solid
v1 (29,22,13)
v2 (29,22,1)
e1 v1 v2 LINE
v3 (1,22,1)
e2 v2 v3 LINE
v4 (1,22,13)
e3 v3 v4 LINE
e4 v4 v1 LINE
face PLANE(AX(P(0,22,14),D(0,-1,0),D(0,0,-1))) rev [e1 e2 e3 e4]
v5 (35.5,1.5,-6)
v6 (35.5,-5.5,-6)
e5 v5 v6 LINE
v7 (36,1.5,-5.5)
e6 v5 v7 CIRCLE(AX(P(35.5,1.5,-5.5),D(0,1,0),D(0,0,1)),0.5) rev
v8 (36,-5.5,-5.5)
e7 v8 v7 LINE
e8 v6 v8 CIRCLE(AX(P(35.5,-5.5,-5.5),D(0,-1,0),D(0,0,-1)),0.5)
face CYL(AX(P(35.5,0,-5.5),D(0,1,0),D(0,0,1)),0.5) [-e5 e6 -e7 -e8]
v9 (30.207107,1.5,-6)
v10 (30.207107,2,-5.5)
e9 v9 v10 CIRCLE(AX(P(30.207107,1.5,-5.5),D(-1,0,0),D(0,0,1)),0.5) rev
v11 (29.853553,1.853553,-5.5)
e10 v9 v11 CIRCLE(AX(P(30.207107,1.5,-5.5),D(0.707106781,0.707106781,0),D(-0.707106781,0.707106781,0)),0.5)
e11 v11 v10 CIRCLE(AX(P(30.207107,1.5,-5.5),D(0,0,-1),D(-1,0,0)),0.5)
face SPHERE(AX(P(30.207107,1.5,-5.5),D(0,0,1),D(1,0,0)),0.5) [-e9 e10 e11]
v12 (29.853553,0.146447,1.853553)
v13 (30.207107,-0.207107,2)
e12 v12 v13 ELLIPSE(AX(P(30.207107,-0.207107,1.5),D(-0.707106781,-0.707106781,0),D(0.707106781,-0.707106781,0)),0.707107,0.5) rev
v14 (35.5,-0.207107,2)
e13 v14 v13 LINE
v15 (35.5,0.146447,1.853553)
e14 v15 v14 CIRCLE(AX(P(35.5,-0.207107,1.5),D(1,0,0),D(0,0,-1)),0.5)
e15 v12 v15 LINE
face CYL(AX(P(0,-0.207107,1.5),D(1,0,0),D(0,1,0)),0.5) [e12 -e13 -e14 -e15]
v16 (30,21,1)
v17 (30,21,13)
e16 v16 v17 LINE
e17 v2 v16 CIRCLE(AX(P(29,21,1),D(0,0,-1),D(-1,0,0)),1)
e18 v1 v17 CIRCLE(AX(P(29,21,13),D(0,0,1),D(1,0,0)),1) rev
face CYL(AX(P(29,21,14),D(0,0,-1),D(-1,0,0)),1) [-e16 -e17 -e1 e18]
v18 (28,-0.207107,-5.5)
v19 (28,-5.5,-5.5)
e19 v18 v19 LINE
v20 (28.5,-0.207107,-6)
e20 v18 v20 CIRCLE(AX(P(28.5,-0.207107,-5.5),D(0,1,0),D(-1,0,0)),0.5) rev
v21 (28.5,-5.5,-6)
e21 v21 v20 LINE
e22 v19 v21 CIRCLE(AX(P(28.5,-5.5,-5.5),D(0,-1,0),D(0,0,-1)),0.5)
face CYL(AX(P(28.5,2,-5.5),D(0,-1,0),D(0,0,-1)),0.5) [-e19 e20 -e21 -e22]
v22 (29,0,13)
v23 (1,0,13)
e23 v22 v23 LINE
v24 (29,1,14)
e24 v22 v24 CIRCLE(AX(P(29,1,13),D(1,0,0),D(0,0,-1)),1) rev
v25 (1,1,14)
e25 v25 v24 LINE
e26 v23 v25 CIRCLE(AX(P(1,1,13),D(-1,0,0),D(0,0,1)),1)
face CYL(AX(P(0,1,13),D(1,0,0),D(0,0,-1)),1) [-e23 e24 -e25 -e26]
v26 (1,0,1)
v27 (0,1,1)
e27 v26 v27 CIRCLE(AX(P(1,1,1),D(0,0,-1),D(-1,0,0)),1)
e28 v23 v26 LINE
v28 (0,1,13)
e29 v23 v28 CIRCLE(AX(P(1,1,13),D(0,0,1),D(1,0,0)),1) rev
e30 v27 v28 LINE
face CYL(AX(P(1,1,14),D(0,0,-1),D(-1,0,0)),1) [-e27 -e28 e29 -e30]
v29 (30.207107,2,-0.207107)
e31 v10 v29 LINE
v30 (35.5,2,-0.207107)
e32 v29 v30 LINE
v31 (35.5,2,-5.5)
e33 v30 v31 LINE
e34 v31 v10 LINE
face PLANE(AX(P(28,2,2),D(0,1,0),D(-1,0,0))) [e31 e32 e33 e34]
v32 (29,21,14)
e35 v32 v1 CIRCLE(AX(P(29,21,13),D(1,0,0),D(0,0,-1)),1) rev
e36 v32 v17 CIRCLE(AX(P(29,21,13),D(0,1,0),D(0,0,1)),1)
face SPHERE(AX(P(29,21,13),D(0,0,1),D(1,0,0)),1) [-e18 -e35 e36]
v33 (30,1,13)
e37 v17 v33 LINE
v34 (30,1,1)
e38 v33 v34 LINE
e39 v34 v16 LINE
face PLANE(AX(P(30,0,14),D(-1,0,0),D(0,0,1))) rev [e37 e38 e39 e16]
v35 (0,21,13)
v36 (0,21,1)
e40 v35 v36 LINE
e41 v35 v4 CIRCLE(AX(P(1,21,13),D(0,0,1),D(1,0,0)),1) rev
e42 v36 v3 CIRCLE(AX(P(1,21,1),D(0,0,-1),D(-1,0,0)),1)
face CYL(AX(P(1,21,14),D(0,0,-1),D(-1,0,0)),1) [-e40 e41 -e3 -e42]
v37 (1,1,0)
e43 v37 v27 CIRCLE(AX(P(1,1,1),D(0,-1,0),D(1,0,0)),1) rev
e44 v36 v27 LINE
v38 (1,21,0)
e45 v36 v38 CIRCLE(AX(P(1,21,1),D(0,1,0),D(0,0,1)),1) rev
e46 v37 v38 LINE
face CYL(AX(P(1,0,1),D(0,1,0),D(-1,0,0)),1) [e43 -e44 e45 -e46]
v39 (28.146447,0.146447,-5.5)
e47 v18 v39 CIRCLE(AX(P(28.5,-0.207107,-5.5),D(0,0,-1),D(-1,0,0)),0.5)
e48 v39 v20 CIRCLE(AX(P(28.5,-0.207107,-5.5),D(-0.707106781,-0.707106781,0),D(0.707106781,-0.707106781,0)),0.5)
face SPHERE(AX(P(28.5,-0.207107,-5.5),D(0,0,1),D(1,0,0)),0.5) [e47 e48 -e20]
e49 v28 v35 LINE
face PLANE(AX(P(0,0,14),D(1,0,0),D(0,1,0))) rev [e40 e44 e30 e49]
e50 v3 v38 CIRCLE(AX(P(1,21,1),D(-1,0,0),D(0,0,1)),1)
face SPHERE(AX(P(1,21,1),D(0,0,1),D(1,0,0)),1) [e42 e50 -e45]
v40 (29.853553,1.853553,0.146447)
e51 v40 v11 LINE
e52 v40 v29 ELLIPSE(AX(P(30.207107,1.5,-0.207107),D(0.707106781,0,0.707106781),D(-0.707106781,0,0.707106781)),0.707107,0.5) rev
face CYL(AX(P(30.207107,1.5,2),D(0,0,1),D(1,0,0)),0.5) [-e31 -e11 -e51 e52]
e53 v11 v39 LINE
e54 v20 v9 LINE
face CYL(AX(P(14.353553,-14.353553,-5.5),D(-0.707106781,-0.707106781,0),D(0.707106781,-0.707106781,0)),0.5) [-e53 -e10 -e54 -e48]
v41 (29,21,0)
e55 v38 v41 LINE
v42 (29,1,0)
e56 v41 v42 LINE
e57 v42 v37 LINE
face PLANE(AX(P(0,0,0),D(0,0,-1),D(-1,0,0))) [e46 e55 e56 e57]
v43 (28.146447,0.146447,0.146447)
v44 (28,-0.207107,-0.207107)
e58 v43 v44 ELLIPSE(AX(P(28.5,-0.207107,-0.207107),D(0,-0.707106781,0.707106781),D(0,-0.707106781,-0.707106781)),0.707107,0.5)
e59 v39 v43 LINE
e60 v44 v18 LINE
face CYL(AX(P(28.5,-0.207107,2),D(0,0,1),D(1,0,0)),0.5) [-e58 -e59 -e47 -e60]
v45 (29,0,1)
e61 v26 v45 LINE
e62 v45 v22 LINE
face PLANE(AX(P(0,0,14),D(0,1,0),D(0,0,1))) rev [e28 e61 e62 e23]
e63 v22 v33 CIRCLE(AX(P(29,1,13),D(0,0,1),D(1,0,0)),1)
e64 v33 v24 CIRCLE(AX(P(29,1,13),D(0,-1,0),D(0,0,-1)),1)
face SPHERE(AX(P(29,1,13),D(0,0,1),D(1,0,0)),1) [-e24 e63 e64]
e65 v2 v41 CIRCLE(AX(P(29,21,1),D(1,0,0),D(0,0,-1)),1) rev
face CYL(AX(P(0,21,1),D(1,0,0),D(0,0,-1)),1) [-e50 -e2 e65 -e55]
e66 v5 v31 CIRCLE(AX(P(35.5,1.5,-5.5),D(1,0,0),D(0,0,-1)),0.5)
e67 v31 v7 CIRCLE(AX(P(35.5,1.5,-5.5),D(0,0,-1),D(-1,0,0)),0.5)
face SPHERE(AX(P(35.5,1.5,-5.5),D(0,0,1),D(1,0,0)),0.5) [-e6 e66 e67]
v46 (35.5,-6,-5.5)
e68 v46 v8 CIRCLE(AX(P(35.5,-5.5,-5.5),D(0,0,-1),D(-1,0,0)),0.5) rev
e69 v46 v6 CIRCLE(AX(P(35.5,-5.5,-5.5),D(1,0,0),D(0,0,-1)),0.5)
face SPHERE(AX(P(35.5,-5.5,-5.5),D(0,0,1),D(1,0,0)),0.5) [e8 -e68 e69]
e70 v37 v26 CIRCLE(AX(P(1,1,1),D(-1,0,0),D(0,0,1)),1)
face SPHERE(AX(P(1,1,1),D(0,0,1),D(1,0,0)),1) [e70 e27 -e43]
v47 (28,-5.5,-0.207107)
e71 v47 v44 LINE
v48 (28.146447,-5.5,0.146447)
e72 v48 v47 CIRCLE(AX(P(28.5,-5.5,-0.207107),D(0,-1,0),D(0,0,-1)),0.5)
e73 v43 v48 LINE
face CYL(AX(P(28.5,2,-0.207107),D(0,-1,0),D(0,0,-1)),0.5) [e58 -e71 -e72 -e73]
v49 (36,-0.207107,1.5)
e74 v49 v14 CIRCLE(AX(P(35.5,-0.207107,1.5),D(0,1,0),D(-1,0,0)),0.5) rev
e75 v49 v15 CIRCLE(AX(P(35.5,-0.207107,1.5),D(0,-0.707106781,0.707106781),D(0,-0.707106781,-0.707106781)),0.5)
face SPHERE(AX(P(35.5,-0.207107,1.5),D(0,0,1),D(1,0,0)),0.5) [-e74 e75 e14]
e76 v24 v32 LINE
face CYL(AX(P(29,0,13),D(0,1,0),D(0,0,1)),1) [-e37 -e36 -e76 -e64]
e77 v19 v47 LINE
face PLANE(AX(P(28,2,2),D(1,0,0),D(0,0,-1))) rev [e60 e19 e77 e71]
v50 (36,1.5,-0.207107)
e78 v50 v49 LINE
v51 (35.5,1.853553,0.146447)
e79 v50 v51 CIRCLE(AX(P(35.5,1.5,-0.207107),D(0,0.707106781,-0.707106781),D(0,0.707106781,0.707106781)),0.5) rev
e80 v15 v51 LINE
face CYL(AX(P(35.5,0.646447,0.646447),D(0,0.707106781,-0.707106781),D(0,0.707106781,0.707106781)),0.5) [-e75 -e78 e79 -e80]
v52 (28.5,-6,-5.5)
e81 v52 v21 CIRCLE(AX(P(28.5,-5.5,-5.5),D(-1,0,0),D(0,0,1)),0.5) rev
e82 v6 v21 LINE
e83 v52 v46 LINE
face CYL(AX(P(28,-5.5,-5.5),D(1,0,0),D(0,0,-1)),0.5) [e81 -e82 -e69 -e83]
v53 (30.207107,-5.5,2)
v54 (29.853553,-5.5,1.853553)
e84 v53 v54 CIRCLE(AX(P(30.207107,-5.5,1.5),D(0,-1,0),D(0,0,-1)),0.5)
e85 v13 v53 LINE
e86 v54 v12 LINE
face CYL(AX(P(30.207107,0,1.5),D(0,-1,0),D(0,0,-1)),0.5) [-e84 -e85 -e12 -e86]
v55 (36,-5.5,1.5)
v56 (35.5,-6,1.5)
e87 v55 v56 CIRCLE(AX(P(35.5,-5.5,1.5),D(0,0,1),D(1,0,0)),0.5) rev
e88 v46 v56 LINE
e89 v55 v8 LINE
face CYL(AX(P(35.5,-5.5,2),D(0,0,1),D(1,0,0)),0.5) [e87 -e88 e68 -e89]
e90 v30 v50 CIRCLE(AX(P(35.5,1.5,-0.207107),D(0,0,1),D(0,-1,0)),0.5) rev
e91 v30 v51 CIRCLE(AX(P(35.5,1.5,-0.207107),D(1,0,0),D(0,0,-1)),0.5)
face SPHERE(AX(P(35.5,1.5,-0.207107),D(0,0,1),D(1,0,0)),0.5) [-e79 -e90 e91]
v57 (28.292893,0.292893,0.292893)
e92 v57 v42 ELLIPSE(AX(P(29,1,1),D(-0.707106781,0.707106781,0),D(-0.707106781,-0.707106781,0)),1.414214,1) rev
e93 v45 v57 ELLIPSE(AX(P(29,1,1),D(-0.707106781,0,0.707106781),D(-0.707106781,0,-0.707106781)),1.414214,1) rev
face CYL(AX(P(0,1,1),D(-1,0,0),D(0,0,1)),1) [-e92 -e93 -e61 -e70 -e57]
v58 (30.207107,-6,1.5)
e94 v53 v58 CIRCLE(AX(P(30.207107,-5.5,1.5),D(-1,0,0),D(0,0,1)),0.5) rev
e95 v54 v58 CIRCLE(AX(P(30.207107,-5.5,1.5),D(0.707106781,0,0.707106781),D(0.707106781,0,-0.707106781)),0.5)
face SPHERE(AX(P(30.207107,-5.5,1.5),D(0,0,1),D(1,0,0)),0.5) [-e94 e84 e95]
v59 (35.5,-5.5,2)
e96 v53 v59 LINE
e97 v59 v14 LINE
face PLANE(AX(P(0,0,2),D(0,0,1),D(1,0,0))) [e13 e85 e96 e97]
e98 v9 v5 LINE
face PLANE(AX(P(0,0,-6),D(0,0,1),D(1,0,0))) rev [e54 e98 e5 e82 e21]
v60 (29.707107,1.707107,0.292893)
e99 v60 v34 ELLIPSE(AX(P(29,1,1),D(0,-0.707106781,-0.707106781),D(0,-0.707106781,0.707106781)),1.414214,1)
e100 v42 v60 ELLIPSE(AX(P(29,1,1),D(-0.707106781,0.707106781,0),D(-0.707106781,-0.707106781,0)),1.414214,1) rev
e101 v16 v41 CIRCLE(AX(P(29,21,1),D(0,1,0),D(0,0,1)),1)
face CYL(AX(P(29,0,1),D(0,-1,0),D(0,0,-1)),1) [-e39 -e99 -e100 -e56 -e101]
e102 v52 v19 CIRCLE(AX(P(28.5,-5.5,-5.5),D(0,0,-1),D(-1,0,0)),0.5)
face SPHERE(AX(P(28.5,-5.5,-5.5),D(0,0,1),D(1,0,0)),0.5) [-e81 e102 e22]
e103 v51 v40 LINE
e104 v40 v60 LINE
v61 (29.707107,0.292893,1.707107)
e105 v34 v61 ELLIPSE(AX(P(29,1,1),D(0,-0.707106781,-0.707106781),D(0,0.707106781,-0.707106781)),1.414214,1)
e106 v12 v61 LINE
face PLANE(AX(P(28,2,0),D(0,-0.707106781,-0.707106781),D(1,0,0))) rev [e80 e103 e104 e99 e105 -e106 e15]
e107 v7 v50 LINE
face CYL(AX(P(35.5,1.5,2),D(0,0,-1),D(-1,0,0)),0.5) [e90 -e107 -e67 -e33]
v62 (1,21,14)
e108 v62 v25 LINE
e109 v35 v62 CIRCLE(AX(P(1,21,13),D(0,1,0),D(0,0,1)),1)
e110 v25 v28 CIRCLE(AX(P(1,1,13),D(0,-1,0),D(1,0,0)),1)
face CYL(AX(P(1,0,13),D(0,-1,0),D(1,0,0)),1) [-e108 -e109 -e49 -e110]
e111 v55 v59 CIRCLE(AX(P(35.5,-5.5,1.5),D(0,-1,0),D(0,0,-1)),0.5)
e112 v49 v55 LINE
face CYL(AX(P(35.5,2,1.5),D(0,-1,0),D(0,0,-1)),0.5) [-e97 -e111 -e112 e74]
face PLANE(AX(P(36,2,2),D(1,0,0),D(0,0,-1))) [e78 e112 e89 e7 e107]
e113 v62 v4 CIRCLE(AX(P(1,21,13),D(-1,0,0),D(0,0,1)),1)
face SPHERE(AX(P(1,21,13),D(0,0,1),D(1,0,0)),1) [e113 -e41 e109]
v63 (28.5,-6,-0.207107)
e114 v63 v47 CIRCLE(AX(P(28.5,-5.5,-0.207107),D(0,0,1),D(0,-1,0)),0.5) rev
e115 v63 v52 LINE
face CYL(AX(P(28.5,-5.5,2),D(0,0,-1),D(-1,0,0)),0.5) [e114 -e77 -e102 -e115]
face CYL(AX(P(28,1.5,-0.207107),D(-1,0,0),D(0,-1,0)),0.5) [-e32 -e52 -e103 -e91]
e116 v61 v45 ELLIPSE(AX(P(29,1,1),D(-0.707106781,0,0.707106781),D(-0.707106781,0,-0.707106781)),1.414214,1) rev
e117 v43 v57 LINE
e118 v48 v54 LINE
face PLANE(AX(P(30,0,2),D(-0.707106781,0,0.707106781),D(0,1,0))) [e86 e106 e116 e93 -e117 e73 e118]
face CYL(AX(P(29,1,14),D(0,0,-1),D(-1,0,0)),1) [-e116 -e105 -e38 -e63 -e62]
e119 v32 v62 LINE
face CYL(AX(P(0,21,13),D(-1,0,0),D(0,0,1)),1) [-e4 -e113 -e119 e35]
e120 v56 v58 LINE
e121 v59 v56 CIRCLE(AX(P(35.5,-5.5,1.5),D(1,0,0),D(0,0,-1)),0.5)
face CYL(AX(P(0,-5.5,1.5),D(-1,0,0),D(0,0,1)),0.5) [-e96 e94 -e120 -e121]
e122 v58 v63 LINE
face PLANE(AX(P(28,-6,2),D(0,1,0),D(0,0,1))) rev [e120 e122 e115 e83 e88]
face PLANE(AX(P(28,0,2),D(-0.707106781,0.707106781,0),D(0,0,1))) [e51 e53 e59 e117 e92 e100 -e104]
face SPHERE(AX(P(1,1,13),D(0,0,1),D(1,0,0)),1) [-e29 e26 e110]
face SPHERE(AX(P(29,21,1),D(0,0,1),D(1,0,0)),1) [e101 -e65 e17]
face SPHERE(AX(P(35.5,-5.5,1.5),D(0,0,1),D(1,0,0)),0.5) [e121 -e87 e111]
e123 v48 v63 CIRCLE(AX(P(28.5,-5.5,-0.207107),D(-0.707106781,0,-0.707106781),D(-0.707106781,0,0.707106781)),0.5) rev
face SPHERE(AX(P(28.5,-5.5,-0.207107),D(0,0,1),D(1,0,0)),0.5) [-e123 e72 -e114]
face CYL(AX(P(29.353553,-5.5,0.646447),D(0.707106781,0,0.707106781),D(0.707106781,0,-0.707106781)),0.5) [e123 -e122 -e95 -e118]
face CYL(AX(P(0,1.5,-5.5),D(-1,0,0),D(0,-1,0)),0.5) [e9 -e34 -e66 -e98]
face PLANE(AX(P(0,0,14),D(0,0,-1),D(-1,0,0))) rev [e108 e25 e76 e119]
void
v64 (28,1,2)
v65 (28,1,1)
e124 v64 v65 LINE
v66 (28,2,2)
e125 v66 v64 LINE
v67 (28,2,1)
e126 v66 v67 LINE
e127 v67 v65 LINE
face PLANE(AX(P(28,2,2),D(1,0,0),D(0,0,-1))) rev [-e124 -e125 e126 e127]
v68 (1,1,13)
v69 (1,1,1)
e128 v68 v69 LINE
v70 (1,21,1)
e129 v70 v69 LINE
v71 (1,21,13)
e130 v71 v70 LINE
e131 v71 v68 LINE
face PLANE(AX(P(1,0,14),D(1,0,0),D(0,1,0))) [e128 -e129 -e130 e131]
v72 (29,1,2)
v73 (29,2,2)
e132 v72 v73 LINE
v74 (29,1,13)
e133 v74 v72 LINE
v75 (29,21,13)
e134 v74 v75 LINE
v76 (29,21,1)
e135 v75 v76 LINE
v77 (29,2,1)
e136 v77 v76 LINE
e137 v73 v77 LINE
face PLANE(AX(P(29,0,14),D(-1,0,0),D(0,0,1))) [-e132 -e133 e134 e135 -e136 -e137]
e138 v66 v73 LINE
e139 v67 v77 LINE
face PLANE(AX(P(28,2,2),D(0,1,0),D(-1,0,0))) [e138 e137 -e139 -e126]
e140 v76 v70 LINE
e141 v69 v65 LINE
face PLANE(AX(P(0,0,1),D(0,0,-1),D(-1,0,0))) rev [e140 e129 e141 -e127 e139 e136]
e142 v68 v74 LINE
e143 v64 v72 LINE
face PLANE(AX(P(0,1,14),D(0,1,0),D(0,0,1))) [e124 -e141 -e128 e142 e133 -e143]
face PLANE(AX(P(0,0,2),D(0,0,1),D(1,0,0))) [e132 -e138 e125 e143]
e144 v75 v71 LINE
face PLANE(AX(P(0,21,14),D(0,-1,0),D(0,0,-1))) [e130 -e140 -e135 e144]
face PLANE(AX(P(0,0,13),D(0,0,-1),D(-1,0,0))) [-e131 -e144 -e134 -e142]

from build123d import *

# Parameters (mm, degrees)
SKETCH1_W                = 30
SKETCH1_H                = 22
BOSS_EXTRUDE1_DEPTH      = 14
SHELL1_T                 = 1
BOSS_EXTRUDE3_DEPTH      = 6
BOSS_EXTRUDE3_DEPTH_BACK = 2
SKETCH2_W                = 8
SKETCH2_H                = 8
CHAMFER2_SIZE            = 2
FILLET1_R                = 1
FILLET2_R                = 0.5


with BuildPart() as part:
    # Sketch1 → Boss-Extrude1 (new body)
    with BuildSketch(Plane.XY):
        with Locations((15, 11)):
            Rectangle(SKETCH1_W, SKETCH1_H)
    extrude(amount=BOSS_EXTRUDE1_DEPTH)

    # Shell1 (no face opened: a closed hollow body)
    add(offset(amount=-SHELL1_T, mode=Mode.PRIVATE), mode=Mode.SUBTRACT)

    # Sketch2 → Boss-Extrude3 (add, two sides: drawn at the far end of the back side and taken through both)
    with BuildSketch(Plane(origin=(0, 0, 0), x_dir=(-1, 0, 0), z_dir=(0, 0, -1)).offset(-BOSS_EXTRUDE3_DEPTH_BACK)):
        with Locations((-32, -2)):
            Rectangle(SKETCH2_W, SKETCH2_H)
    extrude(amount=BOSS_EXTRUDE3_DEPTH + BOSS_EXTRUDE3_DEPTH_BACK)

    # Chamfer2
    chamfer2_edges = [part.edges().sort_by_distance(p)[0] for p in [
        (28, -3, 2),
        (28, 2, -3),
        (33, 2, 2),
    ]]
    chamfer(chamfer2_edges, length=CHAMFER2_SIZE)

    # Fillet1
    # the kernel refuses this fillet: 1 mm, written as the material it takes off along each edge
    with BuildSketch(Plane(origin=(1, 21, 1), x_dir=(0, 1, 0), z_dir=(0, 0, -1))) as fillet1_piece_1_section:
        Polygon((0, 0), (FILLET1_R, 0), (FILLET1_R, -FILLET1_R), (0, -FILLET1_R), align=None)
    fillet1_piece_1 = extrude(amount=FILLET1_R, mode=Mode.PRIVATE)
    fillet1_piece_1 = fillet1_piece_1 - Plane(origin=(1, 21, 1), x_dir=(0.7071067811865475, -0.7071067811865477, 0), z_dir=(0, 0, -1)) * Sphere(FILLET1_R, mode=Mode.PRIVATE)
    add(fillet1_piece_1, mode=Mode.SUBTRACT)
    with BuildSketch(Plane(origin=(1, 1, 1), x_dir=(0, 0, -1), z_dir=(0, -1, 0))) as fillet1_piece_2_section:
        Polygon((0, 0), (FILLET1_R, 0), (FILLET1_R, -FILLET1_R), (0, -FILLET1_R), align=None)
    fillet1_piece_2 = extrude(amount=FILLET1_R, mode=Mode.PRIVATE)
    fillet1_piece_2 = fillet1_piece_2 - Plane(origin=(1, 1, 1), x_dir=(0.7071067811865475, 0, 0.7071067811865475), z_dir=(0, -1, 0)) * Sphere(FILLET1_R, mode=Mode.PRIVATE)
    add(fillet1_piece_2, mode=Mode.SUBTRACT)
    with BuildSketch(Plane(origin=(29, 21, 1), x_dir=(0, 0, -1), z_dir=(0, 1, 0))) as fillet1_piece_3_section:
        Polygon((0, 0), (FILLET1_R, 0), (FILLET1_R, -FILLET1_R), (0, -FILLET1_R), align=None)
    fillet1_piece_3 = extrude(amount=FILLET1_R, mode=Mode.PRIVATE)
    fillet1_piece_3 = fillet1_piece_3 - Plane(origin=(29, 21, 1), x_dir=(-0.7071067811865475, 0, 0.7071067811865475), z_dir=(0, 1, 0)) * Sphere(FILLET1_R, mode=Mode.PRIVATE)
    add(fillet1_piece_3, mode=Mode.SUBTRACT)
    with BuildSketch(Plane(origin=(1, 1, 13), x_dir=(-1, 0, 0), z_dir=(0, -1, 0))) as fillet1_piece_4_section:
        Polygon((0, 0), (FILLET1_R, 0), (FILLET1_R, -FILLET1_R), (0, -FILLET1_R), align=None)
    fillet1_piece_4 = extrude(amount=FILLET1_R, mode=Mode.PRIVATE)
    fillet1_piece_4 = fillet1_piece_4 - Plane(origin=(1, 1, 13), x_dir=(0.7071067811865475, 0, -0.7071067811865475), z_dir=(0, -1, 0)) * Sphere(FILLET1_R, mode=Mode.PRIVATE)
    add(fillet1_piece_4, mode=Mode.SUBTRACT)
    with BuildSketch(Plane(origin=(29, 1, 13), x_dir=(1, 0, 0), z_dir=(0, -1, 0))) as fillet1_piece_5_section:
        Polygon((0, 0), (FILLET1_R, 0), (FILLET1_R, FILLET1_R), (0, FILLET1_R), align=None)
    fillet1_piece_5 = extrude(amount=FILLET1_R, mode=Mode.PRIVATE)
    fillet1_piece_5 = fillet1_piece_5 - Plane(origin=(29, 1, 13), x_dir=(-0.7071067811865475, 0, -0.7071067811865475), z_dir=(0, -1, 0)) * Sphere(FILLET1_R, mode=Mode.PRIVATE)
    add(fillet1_piece_5, mode=Mode.SUBTRACT)
    with BuildSketch(Plane(origin=(29, 21, 13), x_dir=(1, 0, 0), z_dir=(0, 1, 0))) as fillet1_piece_6_section:
        Polygon((0, 0), (FILLET1_R, 0), (FILLET1_R, -FILLET1_R), (0, -FILLET1_R), align=None)
    fillet1_piece_6 = extrude(amount=FILLET1_R, mode=Mode.PRIVATE)
    fillet1_piece_6 = fillet1_piece_6 - Plane(origin=(29, 21, 13), x_dir=(-0.7071067811865475, 0, -0.7071067811865475), z_dir=(0, 1, 0)) * Sphere(FILLET1_R, mode=Mode.PRIVATE)
    add(fillet1_piece_6, mode=Mode.SUBTRACT)
    with BuildSketch(Plane(origin=(1, 21, 13), x_dir=(-1, 0, 0), z_dir=(0, 1, 0))) as fillet1_piece_7_section:
        Polygon((0, 0), (FILLET1_R, 0), (FILLET1_R, FILLET1_R), (0, FILLET1_R), align=None)
    fillet1_piece_7 = extrude(amount=FILLET1_R, mode=Mode.PRIVATE)
    fillet1_piece_7 = fillet1_piece_7 - Plane(origin=(1, 21, 13), x_dir=(0.7071067811865475, 0, -0.7071067811865475), z_dir=(0, 1, 0)) * Sphere(FILLET1_R, mode=Mode.PRIVATE)
    add(fillet1_piece_7, mode=Mode.SUBTRACT)
    with BuildSketch(Plane(origin=(0, 21, 0), x_dir=(1, 0, 0), z_dir=(0, -1, 0)), Plane(origin=(30, 1, 14), x_dir=(0, 0, -1), z_dir=(0, 1, 0)), Plane(origin=(0, 21, 14), x_dir=(0, 0, -1), z_dir=(0, -1, 0))) as fillet1_piece_8:
        with BuildLine():
            CenterArc((FILLET1_R, FILLET1_R), FILLET1_R, 180, 90)
            Line((0, FILLET1_R), (0, 0))
            Line((0, 0), (FILLET1_R, 0))
        make_face()
    extrude(amount=20, mode=Mode.SUBTRACT)
    with BuildSketch(Plane(origin=(1, 0, 0), x_dir=(0, 0, 1), z_dir=(1, 0, 0))) as fillet1_piece_9_section:
        with BuildLine():
            CenterArc((FILLET1_R, -FILLET1_R), FILLET1_R, 90, 90)
            Line((0, -FILLET1_R), (0, 0))
            Line((0, 0), (FILLET1_R, 0))
        make_face()
    fillet1_piece_9 = extrude(amount=29.5, mode=Mode.PRIVATE)
    fillet1_piece_9 = split(fillet1_piece_9, bisect_by=Plane(origin=(21.381816869, 0.226411675, -6.618183131), z_dir=(-0.7071067811865476, 0, 0.7071067811865476)), keep=Keep.TOP, mode=Mode.PRIVATE)
    fillet1_piece_9 = split(fillet1_piece_9, bisect_by=Plane(origin=(21.381816869, -6.618183131, 0.226411675), z_dir=(-0.7071067811865476, 0.7071067811865476, 0)), keep=Keep.TOP, mode=Mode.PRIVATE)
    add(fillet1_piece_9, mode=Mode.SUBTRACT)
    with BuildSketch(Plane(origin=(1, 0, 0), x_dir=(0, 0, 1), z_dir=(1, 0, 0))) as fillet1_piece_10_section:
        with BuildLine():
            CenterArc((FILLET1_R, -FILLET1_R), FILLET1_R, 90, 90)
            Line((0, -FILLET1_R), (0, 0))
            Line((0, 0), (FILLET1_R, 0))
        make_face()
    fillet1_piece_10 = extrude(amount=29.5, mode=Mode.PRIVATE)
    fillet1_piece_10 = split(fillet1_piece_10, bisect_by=Plane(origin=(28.16446835, 0.528927527, 0.16446835), z_dir=(0.7071067811865476, 0, -0.7071067811865476)), keep=Keep.TOP, mode=Mode.PRIVATE)
    fillet1_piece_10 = split(fillet1_piece_10, bisect_by=Plane(origin=(28.407441135, 0.407441135, 0.042981958), z_dir=(-0.7071067811865476, 0.7071067811865476, 0)), keep=Keep.TOP, mode=Mode.PRIVATE)
    add(fillet1_piece_10, mode=Mode.SUBTRACT)
    with BuildSketch(Plane(origin=(1, 0, 0), x_dir=(0, 0, 1), z_dir=(1, 0, 0))) as fillet1_piece_11_section:
        with BuildLine():
            CenterArc((FILLET1_R, -FILLET1_R), FILLET1_R, 90, 90)
            Line((0, -FILLET1_R), (0, 0))
            Line((0, 0), (FILLET1_R, 0))
        make_face()
    fillet1_piece_11 = extrude(amount=29.5, mode=Mode.PRIVATE)
    fillet1_piece_11 = split(fillet1_piece_11, bisect_by=Plane(origin=(28.407441135, 0.042981958, 0.407441135), z_dir=(-0.7071067811865476, 0, 0.7071067811865476)), keep=Keep.TOP, mode=Mode.PRIVATE)
    fillet1_piece_11 = split(fillet1_piece_11, bisect_by=Plane(origin=(28.16446835, 0.16446835, 0.528927527), z_dir=(0.7071067811865476, -0.7071067811865476, 0)), keep=Keep.TOP, mode=Mode.PRIVATE)
    add(fillet1_piece_11, mode=Mode.SUBTRACT)
    with BuildSketch(Plane(origin=(30, -0.5, 0), x_dir=(-1, 0, 0), z_dir=(0, 1, 0))) as fillet1_piece_12_section:
        with BuildLine():
            CenterArc((FILLET1_R, FILLET1_R), FILLET1_R, 180, 90)
            Line((0, FILLET1_R), (0, 0))
            Line((0, 0), (FILLET1_R, 0))
        make_face()
    fillet1_piece_12 = extrude(amount=21.5, mode=Mode.PRIVATE)
    fillet1_piece_12 = split(fillet1_piece_12, bisect_by=Plane(origin=(29.83553165, 1.83553165, 0.528927527), z_dir=(0.7071067811865476, -0.7071067811865476, 0)), keep=Keep.TOP, mode=Mode.PRIVATE)
    fillet1_piece_12 = split(fillet1_piece_12, bisect_by=Plane(origin=(29.957018042, 1.592558865, 0.407441135), z_dir=(0, 0.7071067811865476, 0.7071067811865476)), keep=Keep.TOP, mode=Mode.PRIVATE)
    add(fillet1_piece_12, mode=Mode.SUBTRACT)
    with BuildSketch(Plane(origin=(30, -0.5, 0), x_dir=(-1, 0, 0), z_dir=(0, 1, 0))) as fillet1_piece_13_section:
        with BuildLine():
            CenterArc((FILLET1_R, FILLET1_R), FILLET1_R, 180, 90)
            Line((0, FILLET1_R), (0, 0))
            Line((0, 0), (FILLET1_R, 0))
        make_face()
    fillet1_piece_13 = extrude(amount=21.5, mode=Mode.PRIVATE)
    fillet1_piece_13 = split(fillet1_piece_13, bisect_by=Plane(origin=(29.592558865, 1.592558865, 0.042981958), z_dir=(-0.7071067811865476, 0.7071067811865476, 0)), keep=Keep.TOP, mode=Mode.PRIVATE)
    fillet1_piece_13 = split(fillet1_piece_13, bisect_by=Plane(origin=(29.471072473, 1.83553165, 0.16446835), z_dir=(0, -0.7071067811865476, -0.7071067811865476)), keep=Keep.TOP, mode=Mode.PRIVATE)
    add(fillet1_piece_13, mode=Mode.SUBTRACT)
    with BuildSketch(Plane(origin=(30, -0.5, 0), x_dir=(-1, 0, 0), z_dir=(0, 1, 0))) as fillet1_piece_14_section:
        with BuildLine():
            CenterArc((FILLET1_R, FILLET1_R), FILLET1_R, 180, 90)
            Line((0, FILLET1_R), (0, 0))
            Line((0, 0), (FILLET1_R, 0))
        make_face()
    fillet1_piece_14 = extrude(amount=21.5, mode=Mode.PRIVATE)
    fillet1_piece_14 = split(fillet1_piece_14, bisect_by=Plane(origin=(34.618159496, 6.618159496, 0.226418621), z_dir=(-0.7071067811865476, 0.7071067811865476, 0)), keep=Keep.TOP, mode=Mode.PRIVATE)
    fillet1_piece_14 = split(fillet1_piece_14, bisect_by=Plane(origin=(29.773581379, 6.618159496, -4.618159496), z_dir=(0, 0.7071067811865476, 0.7071067811865476)), keep=Keep.TOP, mode=Mode.PRIVATE)
    add(fillet1_piece_14, mode=Mode.SUBTRACT)
    with BuildSketch(Plane(origin=(29, 22, 0), x_dir=(0, -1, 0), z_dir=(-1, 0, 0)), Plane(origin=(1, 0, 14), x_dir=(0, 0, -1), z_dir=(1, 0, 0))) as fillet1_piece_15:
        with BuildLine():
            CenterArc((FILLET1_R, FILLET1_R), FILLET1_R, 180, 90)
            Line((0, FILLET1_R), (0, 0))
            Line((0, 0), (FILLET1_R, 0))
        make_face()
    extrude(amount=28, mode=Mode.SUBTRACT)
    with BuildSketch(Plane(origin=(29, 22, 14), x_dir=(0, -1, 0), z_dir=(-1, 0, 0))) as fillet1_piece_16:
        with BuildLine():
            CenterArc((FILLET1_R, -FILLET1_R), FILLET1_R, 90, 90)
            Line((0, -FILLET1_R), (0, 0))
            Line((0, 0), (FILLET1_R, 0))
        make_face()
    extrude(amount=28, mode=Mode.SUBTRACT)
    with BuildSketch(Plane(origin=(0, 22, 1), x_dir=(0, -1, 0), z_dir=(0, 0, 1)), Plane(origin=(0, 0, 1), x_dir=(1, 0, 0), z_dir=(0, 0, 1))) as fillet1_piece_17:
        with BuildLine():
            CenterArc((FILLET1_R, FILLET1_R), FILLET1_R, 180, 90)
            Line((0, FILLET1_R), (0, 0))
            Line((0, 0), (FILLET1_R, 0))
        make_face()
    extrude(amount=12, mode=Mode.SUBTRACT)
    with BuildSketch(Plane(origin=(30, 22, 1), x_dir=(0, -1, 0), z_dir=(0, 0, 1))) as fillet1_piece_18:
        with BuildLine():
            CenterArc((FILLET1_R, -FILLET1_R), FILLET1_R, 90, 90)
            Line((0, -FILLET1_R), (0, 0))
            Line((0, 0), (FILLET1_R, 0))
        make_face()
    extrude(amount=12, mode=Mode.SUBTRACT)
    with BuildSketch(Plane(origin=(30, 0, -0.5), x_dir=(-1, 0, 0), z_dir=(0, 0, 1))) as fillet1_piece_19_section:
        with BuildLine():
            CenterArc((FILLET1_R, -FILLET1_R), FILLET1_R, 90, 90)
            Line((0, -FILLET1_R), (0, 0))
            Line((0, 0), (FILLET1_R, 0))
        make_face()
    fillet1_piece_19 = extrude(amount=13.5, mode=Mode.PRIVATE)
    fillet1_piece_19 = split(fillet1_piece_19, bisect_by=Plane(origin=(29.83553165, 0.528927527, 1.83553165), z_dir=(0.7071067811865476, 0, -0.7071067811865476)), keep=Keep.TOP, mode=Mode.PRIVATE)
    fillet1_piece_19 = split(fillet1_piece_19, bisect_by=Plane(origin=(29.957018042, 0.407441135, 1.592558865), z_dir=(0, 0.7071067811865476, 0.7071067811865476)), keep=Keep.TOP, mode=Mode.PRIVATE)
    add(fillet1_piece_19, mode=Mode.SUBTRACT)
    with BuildSketch(Plane(origin=(30, 0, -0.5), x_dir=(-1, 0, 0), z_dir=(0, 0, 1))) as fillet1_piece_20_section:
        with BuildLine():
            CenterArc((FILLET1_R, -FILLET1_R), FILLET1_R, 90, 90)
            Line((0, -FILLET1_R), (0, 0))
            Line((0, 0), (FILLET1_R, 0))
        make_face()
    fillet1_piece_20 = extrude(amount=13.5, mode=Mode.PRIVATE)
    fillet1_piece_20 = split(fillet1_piece_20, bisect_by=Plane(origin=(29.592558865, 0.042981958, 1.592558865), z_dir=(-0.7071067811865476, 0, 0.7071067811865476)), keep=Keep.TOP, mode=Mode.PRIVATE)
    fillet1_piece_20 = split(fillet1_piece_20, bisect_by=Plane(origin=(29.471072473, 0.16446835, 1.83553165), z_dir=(0, -0.7071067811865476, -0.7071067811865476)), keep=Keep.TOP, mode=Mode.PRIVATE)
    add(fillet1_piece_20, mode=Mode.SUBTRACT)
    with BuildSketch(Plane(origin=(30, 0, -0.5), x_dir=(-1, 0, 0), z_dir=(0, 0, 1))) as fillet1_piece_21_section:
        with BuildLine():
            CenterArc((FILLET1_R, -FILLET1_R), FILLET1_R, 90, 90)
            Line((0, -FILLET1_R), (0, 0))
            Line((0, 0), (FILLET1_R, 0))
        make_face()
    fillet1_piece_21 = extrude(amount=13.5, mode=Mode.PRIVATE)
    fillet1_piece_21 = split(fillet1_piece_21, bisect_by=Plane(origin=(32.618101716, 0.226435602, 4.618101716), z_dir=(-0.7071067811865476, 0, 0.7071067811865476)), keep=Keep.TOP, mode=Mode.PRIVATE)
    fillet1_piece_21 = split(fillet1_piece_21, bisect_by=Plane(origin=(29.773564398, -2.618101716, 4.618101716), z_dir=(0, 0.7071067811865476, 0.7071067811865476)), keep=Keep.TOP, mode=Mode.PRIVATE)
    add(fillet1_piece_21, mode=Mode.SUBTRACT)

    # Fillet2
    fillet2_edges = [part.edges().sort_by_distance(p)[0] for p in [
        (32, -6, -6),
        (36, -6, -2),
        (36, -2, -6),
        (36, 2, -3),
        (33, 2, -6),
        (30, 2, -3),
        (33, 2, 0),
        (36, -3, 2),
        (36, 1, 1),
        (33, -6, 2),
        (30, -3, 2),
        (33, 0, 2),
        (28, -3, -6),
        (28, -6, -3),
        (28, -3, 0),
        (28, 0, -3),
        (29, 1, -6),
        (29, -6, 1),
    ]]
    fillet(fillet2_edges, radius=FILLET2_R)


solid = part.part
